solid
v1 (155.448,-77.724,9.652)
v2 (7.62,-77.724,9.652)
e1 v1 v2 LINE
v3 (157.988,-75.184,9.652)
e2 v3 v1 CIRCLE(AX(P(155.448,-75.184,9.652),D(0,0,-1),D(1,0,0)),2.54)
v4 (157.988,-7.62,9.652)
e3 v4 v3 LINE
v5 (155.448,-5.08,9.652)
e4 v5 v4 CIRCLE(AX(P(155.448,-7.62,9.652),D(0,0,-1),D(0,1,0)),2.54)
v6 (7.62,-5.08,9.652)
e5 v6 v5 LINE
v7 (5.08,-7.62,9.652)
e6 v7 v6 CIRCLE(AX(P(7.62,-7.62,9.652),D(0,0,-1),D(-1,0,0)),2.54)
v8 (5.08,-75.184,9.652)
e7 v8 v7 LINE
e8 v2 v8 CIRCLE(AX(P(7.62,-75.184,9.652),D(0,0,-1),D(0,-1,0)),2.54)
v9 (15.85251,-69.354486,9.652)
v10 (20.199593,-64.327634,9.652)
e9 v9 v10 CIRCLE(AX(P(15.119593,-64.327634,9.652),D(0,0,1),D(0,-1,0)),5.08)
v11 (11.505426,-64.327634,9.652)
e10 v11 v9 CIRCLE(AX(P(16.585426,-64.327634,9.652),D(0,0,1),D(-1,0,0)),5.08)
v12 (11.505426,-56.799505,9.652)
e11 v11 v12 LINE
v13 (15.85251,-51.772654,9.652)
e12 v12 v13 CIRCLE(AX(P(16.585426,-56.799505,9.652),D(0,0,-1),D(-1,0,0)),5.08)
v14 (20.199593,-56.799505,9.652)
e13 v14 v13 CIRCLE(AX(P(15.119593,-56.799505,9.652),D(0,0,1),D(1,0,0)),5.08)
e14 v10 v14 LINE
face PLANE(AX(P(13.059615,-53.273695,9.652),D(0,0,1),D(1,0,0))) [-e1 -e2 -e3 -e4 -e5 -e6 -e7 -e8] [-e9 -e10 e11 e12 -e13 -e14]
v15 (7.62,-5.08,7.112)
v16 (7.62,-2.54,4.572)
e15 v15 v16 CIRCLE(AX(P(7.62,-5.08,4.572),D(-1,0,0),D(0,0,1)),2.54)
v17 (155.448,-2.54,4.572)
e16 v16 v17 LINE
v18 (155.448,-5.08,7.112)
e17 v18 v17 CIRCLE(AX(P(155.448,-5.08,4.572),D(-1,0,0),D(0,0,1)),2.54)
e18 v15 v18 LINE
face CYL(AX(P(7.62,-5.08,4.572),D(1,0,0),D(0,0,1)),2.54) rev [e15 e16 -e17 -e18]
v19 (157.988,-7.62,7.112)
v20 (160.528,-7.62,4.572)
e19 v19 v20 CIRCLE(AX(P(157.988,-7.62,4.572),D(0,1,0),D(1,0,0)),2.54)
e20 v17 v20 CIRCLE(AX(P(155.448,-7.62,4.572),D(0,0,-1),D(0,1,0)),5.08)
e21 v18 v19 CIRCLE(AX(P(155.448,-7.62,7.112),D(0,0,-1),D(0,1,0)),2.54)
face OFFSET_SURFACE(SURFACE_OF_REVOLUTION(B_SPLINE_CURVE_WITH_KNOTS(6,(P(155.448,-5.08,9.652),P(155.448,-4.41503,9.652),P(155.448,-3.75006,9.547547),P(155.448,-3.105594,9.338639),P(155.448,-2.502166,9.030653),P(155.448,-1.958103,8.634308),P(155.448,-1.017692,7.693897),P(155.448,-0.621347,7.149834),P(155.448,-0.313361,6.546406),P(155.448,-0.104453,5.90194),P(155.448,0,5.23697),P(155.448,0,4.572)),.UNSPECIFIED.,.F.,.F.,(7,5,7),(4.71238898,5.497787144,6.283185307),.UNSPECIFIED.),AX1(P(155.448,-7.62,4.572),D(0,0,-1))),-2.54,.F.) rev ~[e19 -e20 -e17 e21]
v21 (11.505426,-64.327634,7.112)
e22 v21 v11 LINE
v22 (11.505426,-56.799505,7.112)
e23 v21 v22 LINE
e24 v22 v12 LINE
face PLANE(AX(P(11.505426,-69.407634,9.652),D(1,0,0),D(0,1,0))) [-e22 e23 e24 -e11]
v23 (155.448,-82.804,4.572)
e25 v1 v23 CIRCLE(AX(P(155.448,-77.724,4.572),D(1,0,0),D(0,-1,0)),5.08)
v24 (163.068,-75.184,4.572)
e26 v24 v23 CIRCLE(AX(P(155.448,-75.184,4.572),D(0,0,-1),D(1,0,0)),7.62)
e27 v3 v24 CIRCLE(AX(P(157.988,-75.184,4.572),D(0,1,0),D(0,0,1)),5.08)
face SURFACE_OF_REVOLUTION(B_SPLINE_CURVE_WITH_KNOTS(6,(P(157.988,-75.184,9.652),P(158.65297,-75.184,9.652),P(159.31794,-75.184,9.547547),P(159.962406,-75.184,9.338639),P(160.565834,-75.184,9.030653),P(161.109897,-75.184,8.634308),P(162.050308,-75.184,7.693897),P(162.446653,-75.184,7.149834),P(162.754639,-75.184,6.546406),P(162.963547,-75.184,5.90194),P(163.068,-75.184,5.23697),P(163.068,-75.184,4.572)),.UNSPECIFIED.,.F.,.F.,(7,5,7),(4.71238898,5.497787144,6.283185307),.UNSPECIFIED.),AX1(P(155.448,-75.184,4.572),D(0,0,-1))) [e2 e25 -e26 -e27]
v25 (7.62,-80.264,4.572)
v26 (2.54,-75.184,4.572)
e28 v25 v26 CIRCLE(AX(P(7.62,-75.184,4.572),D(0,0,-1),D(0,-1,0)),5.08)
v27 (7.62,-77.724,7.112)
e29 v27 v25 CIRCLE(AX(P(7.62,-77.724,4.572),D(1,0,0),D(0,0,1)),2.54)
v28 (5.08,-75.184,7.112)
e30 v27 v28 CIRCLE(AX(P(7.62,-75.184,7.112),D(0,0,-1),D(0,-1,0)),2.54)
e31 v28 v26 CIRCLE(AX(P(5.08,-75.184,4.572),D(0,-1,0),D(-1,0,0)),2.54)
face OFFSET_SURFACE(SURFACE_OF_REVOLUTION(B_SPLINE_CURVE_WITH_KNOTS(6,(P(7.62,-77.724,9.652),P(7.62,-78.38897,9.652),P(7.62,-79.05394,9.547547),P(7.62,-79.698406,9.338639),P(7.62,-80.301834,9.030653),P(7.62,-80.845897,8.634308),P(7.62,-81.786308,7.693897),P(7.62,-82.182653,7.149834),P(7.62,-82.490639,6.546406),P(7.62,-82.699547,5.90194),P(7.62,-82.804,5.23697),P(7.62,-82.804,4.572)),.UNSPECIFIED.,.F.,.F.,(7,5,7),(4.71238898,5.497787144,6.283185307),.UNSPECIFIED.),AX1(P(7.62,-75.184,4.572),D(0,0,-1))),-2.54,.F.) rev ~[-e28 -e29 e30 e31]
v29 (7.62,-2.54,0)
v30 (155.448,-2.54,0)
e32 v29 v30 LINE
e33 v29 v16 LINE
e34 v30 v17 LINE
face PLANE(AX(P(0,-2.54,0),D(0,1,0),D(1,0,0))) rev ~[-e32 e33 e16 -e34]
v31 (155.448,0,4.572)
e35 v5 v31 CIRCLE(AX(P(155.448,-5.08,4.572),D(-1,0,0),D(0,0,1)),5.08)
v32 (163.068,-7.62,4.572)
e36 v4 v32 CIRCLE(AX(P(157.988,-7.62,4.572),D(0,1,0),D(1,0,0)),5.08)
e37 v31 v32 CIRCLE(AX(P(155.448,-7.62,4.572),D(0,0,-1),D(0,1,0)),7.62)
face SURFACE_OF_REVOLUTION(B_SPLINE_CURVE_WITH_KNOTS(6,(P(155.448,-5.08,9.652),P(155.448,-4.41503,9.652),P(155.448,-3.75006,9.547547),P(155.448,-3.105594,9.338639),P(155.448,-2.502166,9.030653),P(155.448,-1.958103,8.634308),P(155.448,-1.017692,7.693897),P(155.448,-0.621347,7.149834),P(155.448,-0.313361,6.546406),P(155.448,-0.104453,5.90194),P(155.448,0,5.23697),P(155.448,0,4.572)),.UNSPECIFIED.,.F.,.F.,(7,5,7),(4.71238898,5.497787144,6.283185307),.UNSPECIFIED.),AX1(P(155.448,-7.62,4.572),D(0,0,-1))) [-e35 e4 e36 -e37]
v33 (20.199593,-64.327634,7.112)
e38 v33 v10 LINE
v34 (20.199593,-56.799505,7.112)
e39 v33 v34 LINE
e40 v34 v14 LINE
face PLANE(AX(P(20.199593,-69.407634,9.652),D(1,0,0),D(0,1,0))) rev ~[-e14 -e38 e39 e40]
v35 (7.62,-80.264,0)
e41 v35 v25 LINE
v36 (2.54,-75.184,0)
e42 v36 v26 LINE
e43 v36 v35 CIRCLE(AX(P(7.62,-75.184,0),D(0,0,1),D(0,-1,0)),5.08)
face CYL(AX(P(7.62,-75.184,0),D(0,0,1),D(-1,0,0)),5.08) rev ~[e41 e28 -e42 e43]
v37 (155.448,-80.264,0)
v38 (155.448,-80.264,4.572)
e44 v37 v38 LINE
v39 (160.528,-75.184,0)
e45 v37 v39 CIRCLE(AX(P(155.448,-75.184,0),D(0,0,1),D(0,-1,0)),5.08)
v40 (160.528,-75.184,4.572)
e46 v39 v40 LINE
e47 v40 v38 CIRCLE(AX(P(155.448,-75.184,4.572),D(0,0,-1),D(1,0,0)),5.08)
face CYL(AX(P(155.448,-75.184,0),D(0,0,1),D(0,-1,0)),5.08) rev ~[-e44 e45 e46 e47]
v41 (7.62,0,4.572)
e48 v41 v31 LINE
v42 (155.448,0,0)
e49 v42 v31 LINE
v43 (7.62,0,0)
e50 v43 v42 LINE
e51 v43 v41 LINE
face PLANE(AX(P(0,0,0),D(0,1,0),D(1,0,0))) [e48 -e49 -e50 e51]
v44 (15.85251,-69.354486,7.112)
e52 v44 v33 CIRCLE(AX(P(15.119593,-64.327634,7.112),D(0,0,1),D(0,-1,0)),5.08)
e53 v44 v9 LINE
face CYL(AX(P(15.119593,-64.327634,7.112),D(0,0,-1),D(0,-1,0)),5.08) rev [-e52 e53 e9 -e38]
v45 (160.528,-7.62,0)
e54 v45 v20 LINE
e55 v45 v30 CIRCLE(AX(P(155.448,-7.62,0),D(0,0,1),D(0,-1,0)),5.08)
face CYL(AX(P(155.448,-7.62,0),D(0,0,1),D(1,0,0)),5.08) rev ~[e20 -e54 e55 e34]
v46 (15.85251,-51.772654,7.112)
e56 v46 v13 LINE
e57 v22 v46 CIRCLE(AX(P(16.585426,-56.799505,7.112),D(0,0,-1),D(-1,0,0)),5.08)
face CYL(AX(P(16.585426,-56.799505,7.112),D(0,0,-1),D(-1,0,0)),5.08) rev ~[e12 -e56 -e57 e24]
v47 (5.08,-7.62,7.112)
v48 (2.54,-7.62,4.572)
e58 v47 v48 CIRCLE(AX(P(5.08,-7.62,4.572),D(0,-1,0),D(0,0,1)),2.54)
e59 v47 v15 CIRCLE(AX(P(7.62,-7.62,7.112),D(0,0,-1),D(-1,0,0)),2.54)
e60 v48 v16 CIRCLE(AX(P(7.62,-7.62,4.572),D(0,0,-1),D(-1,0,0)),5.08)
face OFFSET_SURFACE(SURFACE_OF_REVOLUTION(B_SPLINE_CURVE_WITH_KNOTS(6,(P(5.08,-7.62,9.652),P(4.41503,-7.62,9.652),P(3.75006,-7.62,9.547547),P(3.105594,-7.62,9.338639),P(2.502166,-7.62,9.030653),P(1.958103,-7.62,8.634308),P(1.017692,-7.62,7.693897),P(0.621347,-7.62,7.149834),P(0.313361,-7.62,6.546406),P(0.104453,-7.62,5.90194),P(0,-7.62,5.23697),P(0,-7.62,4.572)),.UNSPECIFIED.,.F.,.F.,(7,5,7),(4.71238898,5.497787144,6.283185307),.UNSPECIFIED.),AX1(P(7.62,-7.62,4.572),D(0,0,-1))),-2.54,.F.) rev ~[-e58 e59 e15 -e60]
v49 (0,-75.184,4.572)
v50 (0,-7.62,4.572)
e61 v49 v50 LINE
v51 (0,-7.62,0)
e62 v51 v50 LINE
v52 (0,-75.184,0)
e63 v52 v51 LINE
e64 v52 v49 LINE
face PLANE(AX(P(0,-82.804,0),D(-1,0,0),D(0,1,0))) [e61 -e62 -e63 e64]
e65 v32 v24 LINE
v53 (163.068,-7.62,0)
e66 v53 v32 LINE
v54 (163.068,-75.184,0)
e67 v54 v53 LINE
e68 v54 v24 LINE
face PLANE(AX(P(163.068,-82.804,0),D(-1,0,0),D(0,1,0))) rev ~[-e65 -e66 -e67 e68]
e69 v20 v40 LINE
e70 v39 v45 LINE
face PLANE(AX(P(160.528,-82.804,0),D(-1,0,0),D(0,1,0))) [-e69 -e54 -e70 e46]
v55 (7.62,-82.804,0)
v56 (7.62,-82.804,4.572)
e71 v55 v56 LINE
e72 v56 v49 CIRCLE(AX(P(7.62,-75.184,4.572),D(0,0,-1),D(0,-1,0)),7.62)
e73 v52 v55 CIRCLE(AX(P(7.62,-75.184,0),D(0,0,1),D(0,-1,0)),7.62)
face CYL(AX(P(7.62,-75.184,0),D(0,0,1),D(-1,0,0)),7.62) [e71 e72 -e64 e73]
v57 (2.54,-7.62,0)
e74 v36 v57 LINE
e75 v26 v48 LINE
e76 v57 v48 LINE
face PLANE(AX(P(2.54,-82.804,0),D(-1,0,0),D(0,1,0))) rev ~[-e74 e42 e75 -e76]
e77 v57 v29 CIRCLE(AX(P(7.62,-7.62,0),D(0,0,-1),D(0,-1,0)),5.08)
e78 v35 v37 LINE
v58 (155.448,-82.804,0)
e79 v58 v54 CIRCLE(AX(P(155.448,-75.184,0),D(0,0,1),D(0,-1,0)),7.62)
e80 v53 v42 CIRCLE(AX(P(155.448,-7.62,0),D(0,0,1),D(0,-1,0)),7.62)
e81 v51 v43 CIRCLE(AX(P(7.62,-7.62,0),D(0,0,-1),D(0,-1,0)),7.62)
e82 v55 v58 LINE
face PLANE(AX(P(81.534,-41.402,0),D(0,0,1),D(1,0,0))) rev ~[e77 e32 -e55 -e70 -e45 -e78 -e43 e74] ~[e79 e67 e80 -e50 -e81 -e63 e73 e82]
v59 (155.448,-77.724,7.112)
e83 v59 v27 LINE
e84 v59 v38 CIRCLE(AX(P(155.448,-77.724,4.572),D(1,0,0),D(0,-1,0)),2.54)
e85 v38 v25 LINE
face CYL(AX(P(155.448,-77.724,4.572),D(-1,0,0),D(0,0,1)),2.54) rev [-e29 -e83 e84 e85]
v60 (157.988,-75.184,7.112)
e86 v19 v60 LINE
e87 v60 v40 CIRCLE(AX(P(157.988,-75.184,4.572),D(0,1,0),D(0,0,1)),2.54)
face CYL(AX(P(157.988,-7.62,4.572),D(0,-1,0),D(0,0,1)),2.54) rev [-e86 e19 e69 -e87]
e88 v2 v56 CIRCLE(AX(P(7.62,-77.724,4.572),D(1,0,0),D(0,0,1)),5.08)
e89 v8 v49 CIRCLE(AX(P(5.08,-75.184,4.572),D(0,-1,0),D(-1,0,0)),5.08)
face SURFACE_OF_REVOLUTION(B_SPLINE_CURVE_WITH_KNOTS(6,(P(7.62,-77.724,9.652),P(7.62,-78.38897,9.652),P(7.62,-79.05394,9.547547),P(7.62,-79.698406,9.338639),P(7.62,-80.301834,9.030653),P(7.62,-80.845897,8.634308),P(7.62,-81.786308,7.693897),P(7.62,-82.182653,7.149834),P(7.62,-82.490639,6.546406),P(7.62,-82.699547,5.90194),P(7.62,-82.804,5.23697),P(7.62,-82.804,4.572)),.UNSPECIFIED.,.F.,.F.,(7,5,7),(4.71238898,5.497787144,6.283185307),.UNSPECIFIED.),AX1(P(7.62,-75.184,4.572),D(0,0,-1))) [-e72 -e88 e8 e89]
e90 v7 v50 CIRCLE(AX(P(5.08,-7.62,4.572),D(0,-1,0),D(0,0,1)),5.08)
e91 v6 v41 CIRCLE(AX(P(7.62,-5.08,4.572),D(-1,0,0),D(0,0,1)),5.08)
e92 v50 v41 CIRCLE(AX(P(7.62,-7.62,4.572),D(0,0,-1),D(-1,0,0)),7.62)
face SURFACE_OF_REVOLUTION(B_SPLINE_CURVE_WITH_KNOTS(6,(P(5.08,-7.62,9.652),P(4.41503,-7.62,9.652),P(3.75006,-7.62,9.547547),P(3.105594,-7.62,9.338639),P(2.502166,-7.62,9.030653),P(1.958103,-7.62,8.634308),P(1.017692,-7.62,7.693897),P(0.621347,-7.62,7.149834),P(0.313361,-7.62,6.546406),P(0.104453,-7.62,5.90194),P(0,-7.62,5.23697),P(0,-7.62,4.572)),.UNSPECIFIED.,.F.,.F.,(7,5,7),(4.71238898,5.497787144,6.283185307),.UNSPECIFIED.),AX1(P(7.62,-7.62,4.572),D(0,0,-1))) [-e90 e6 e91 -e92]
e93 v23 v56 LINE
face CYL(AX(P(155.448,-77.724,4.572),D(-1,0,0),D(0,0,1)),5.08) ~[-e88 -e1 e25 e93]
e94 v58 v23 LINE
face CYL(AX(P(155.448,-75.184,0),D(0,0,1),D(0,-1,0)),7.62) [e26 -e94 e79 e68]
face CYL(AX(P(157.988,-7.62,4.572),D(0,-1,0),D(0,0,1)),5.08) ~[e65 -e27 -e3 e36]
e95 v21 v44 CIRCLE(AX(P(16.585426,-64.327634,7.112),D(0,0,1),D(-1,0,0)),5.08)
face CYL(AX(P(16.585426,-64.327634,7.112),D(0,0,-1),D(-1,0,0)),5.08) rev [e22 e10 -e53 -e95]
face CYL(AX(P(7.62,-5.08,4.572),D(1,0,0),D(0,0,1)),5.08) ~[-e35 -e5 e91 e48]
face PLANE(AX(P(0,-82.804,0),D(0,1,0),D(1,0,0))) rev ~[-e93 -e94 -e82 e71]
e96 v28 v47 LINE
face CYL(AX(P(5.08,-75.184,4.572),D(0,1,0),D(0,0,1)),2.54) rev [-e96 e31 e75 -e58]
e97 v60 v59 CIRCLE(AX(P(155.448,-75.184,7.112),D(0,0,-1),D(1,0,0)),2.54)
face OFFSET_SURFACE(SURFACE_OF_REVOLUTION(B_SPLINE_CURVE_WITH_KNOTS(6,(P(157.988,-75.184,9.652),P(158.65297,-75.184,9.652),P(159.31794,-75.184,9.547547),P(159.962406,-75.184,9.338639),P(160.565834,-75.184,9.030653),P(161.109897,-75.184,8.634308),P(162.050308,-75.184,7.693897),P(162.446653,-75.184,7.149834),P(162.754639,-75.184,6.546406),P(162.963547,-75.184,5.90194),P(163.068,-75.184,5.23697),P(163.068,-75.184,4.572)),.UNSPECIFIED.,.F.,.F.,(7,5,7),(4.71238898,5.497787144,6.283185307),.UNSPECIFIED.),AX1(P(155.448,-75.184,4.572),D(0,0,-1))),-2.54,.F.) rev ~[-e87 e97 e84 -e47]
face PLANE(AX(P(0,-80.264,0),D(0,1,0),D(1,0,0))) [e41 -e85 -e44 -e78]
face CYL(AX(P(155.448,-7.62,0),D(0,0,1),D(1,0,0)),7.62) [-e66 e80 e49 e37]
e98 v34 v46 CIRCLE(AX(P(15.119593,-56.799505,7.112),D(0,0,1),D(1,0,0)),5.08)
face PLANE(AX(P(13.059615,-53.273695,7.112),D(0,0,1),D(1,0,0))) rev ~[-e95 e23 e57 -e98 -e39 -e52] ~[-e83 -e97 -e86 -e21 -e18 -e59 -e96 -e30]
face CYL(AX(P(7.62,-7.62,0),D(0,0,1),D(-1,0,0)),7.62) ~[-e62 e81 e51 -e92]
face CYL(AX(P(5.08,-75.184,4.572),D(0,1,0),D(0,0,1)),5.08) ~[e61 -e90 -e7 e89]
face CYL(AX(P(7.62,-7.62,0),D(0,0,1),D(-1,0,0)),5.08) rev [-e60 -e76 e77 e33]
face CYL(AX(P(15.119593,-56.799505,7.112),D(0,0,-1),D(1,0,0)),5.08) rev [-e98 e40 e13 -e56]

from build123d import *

# Parameters (mm, degrees)
F0_W        = 163.068
F0_H        = 82.804
F1_DEPTH    = 9.652
F2_R        = 7.62
F3_R        = 5.08
F4_T        = -2.54
F6_W        = 8.6941672489
F6_H        = 17.6881290972
F7_DEPTH    = 25.4
F8_T1_DEPTH = 2.54


# Not quite as in the source:
# - a fillet or chamfer that OpenCascade refuses, or shapes differently, is made with other operations: its cross-section is extruded or revolved along the edge and cut away or added


with BuildPart() as f1:
    # F0 (on Top) → F1 (new body)
    with BuildSketch(Plane.XY):
        with Locations((81.534, -41.402)):
            Rectangle(F0_W, F0_H)
    extrude(amount=F1_DEPTH)

    # F2
    f2_edges = [f1.edges().sort_by_distance(p)[0] for p in [
        (0, 0, 4.826),
        (163.068, 0, 4.826),
        (163.068, -82.804, 4.826),
        (0, -82.804, 4.826),
    ]]
    fillet(f2_edges, radius=F2_R)

    # F3
    f3_edges = [f1.edges().sort_by_distance(p)[0] for p in [
        (81.534, 0, 9.652),
        (160.836154, -2.231846, 9.652),
        (2.231846, -2.231846, 9.652),
        (163.068, -41.402, 9.652),
        (0, -41.402, 9.652),
        (160.836154, -80.572154, 9.652),
        (2.231846, -80.572154, 9.652),
        (81.534, -82.804, 9.652),
    ]]
    fillet(f3_edges, radius=F3_R)

    # F4
    f4_openings = [f1.faces().sort_by_distance(p)[0] for p in [
        (81.534, -41.402, 0),
    ]]
    offset(amount=F4_T, openings=f4_openings)

    # F6 (on face) → F7 (cut)
    with BuildSketch(Plane.XY.offset(9.652)):
        with Locations((15.8525095321, -60.5635698885)):
            Rectangle(F6_W, F6_H)
    extrude(amount=-F7_DEPTH, mode=Mode.SUBTRACT)

    # F8: fillet of radius 5.08 on 4 edges, made by hand

    # F8_s2 → F8_t1 (join)
    with BuildSketch(Plane.XY.offset(7.112)):
        with BuildLine():
            ThreePointArc((11.5054259077, -56.7995053399), (12.9933234592, -53.2074028914), (16.5854259077, -51.7195053399))
            Line((16.5854259077, -51.7195053399), (11.5054259077, -51.7195053399))
            Line((11.5054259077, -51.7195053399), (11.5054259077, -56.7995053399))
        make_face()
        with BuildLine():
            ThreePointArc((11.5054259077, -64.3276344371), (12.9933234592, -67.9197368855), (16.5854259077, -69.4076344371))
            Line((16.5854259077, -69.4076344371), (11.5054259077, -69.4076344371))
            Line((11.5054259077, -69.4076344371), (11.5054259077, -64.3276344371))
        make_face()
        with BuildLine():
            ThreePointArc((20.1995931566, -56.7995053399), (18.711695605, -53.2074028914), (15.1195931566, -51.7195053399))
            Line((15.1195931566, -51.7195053399), (20.1995931566, -51.7195053399))
            Line((20.1995931566, -51.7195053399), (20.1995931566, -56.7995053399))
        make_face()
        with BuildLine():
            ThreePointArc((15.1195931566, -69.4076344371), (18.711695605, -67.9197368855), (20.1995931566, -64.3276344371))
            Line((20.1995931566, -64.3276344371), (20.1995931566, -69.4076344371))
            Line((20.1995931566, -69.4076344371), (15.1195931566, -69.4076344371))
        make_face()
    extrude(amount=F8_T1_DEPTH)


solid = f1.part
